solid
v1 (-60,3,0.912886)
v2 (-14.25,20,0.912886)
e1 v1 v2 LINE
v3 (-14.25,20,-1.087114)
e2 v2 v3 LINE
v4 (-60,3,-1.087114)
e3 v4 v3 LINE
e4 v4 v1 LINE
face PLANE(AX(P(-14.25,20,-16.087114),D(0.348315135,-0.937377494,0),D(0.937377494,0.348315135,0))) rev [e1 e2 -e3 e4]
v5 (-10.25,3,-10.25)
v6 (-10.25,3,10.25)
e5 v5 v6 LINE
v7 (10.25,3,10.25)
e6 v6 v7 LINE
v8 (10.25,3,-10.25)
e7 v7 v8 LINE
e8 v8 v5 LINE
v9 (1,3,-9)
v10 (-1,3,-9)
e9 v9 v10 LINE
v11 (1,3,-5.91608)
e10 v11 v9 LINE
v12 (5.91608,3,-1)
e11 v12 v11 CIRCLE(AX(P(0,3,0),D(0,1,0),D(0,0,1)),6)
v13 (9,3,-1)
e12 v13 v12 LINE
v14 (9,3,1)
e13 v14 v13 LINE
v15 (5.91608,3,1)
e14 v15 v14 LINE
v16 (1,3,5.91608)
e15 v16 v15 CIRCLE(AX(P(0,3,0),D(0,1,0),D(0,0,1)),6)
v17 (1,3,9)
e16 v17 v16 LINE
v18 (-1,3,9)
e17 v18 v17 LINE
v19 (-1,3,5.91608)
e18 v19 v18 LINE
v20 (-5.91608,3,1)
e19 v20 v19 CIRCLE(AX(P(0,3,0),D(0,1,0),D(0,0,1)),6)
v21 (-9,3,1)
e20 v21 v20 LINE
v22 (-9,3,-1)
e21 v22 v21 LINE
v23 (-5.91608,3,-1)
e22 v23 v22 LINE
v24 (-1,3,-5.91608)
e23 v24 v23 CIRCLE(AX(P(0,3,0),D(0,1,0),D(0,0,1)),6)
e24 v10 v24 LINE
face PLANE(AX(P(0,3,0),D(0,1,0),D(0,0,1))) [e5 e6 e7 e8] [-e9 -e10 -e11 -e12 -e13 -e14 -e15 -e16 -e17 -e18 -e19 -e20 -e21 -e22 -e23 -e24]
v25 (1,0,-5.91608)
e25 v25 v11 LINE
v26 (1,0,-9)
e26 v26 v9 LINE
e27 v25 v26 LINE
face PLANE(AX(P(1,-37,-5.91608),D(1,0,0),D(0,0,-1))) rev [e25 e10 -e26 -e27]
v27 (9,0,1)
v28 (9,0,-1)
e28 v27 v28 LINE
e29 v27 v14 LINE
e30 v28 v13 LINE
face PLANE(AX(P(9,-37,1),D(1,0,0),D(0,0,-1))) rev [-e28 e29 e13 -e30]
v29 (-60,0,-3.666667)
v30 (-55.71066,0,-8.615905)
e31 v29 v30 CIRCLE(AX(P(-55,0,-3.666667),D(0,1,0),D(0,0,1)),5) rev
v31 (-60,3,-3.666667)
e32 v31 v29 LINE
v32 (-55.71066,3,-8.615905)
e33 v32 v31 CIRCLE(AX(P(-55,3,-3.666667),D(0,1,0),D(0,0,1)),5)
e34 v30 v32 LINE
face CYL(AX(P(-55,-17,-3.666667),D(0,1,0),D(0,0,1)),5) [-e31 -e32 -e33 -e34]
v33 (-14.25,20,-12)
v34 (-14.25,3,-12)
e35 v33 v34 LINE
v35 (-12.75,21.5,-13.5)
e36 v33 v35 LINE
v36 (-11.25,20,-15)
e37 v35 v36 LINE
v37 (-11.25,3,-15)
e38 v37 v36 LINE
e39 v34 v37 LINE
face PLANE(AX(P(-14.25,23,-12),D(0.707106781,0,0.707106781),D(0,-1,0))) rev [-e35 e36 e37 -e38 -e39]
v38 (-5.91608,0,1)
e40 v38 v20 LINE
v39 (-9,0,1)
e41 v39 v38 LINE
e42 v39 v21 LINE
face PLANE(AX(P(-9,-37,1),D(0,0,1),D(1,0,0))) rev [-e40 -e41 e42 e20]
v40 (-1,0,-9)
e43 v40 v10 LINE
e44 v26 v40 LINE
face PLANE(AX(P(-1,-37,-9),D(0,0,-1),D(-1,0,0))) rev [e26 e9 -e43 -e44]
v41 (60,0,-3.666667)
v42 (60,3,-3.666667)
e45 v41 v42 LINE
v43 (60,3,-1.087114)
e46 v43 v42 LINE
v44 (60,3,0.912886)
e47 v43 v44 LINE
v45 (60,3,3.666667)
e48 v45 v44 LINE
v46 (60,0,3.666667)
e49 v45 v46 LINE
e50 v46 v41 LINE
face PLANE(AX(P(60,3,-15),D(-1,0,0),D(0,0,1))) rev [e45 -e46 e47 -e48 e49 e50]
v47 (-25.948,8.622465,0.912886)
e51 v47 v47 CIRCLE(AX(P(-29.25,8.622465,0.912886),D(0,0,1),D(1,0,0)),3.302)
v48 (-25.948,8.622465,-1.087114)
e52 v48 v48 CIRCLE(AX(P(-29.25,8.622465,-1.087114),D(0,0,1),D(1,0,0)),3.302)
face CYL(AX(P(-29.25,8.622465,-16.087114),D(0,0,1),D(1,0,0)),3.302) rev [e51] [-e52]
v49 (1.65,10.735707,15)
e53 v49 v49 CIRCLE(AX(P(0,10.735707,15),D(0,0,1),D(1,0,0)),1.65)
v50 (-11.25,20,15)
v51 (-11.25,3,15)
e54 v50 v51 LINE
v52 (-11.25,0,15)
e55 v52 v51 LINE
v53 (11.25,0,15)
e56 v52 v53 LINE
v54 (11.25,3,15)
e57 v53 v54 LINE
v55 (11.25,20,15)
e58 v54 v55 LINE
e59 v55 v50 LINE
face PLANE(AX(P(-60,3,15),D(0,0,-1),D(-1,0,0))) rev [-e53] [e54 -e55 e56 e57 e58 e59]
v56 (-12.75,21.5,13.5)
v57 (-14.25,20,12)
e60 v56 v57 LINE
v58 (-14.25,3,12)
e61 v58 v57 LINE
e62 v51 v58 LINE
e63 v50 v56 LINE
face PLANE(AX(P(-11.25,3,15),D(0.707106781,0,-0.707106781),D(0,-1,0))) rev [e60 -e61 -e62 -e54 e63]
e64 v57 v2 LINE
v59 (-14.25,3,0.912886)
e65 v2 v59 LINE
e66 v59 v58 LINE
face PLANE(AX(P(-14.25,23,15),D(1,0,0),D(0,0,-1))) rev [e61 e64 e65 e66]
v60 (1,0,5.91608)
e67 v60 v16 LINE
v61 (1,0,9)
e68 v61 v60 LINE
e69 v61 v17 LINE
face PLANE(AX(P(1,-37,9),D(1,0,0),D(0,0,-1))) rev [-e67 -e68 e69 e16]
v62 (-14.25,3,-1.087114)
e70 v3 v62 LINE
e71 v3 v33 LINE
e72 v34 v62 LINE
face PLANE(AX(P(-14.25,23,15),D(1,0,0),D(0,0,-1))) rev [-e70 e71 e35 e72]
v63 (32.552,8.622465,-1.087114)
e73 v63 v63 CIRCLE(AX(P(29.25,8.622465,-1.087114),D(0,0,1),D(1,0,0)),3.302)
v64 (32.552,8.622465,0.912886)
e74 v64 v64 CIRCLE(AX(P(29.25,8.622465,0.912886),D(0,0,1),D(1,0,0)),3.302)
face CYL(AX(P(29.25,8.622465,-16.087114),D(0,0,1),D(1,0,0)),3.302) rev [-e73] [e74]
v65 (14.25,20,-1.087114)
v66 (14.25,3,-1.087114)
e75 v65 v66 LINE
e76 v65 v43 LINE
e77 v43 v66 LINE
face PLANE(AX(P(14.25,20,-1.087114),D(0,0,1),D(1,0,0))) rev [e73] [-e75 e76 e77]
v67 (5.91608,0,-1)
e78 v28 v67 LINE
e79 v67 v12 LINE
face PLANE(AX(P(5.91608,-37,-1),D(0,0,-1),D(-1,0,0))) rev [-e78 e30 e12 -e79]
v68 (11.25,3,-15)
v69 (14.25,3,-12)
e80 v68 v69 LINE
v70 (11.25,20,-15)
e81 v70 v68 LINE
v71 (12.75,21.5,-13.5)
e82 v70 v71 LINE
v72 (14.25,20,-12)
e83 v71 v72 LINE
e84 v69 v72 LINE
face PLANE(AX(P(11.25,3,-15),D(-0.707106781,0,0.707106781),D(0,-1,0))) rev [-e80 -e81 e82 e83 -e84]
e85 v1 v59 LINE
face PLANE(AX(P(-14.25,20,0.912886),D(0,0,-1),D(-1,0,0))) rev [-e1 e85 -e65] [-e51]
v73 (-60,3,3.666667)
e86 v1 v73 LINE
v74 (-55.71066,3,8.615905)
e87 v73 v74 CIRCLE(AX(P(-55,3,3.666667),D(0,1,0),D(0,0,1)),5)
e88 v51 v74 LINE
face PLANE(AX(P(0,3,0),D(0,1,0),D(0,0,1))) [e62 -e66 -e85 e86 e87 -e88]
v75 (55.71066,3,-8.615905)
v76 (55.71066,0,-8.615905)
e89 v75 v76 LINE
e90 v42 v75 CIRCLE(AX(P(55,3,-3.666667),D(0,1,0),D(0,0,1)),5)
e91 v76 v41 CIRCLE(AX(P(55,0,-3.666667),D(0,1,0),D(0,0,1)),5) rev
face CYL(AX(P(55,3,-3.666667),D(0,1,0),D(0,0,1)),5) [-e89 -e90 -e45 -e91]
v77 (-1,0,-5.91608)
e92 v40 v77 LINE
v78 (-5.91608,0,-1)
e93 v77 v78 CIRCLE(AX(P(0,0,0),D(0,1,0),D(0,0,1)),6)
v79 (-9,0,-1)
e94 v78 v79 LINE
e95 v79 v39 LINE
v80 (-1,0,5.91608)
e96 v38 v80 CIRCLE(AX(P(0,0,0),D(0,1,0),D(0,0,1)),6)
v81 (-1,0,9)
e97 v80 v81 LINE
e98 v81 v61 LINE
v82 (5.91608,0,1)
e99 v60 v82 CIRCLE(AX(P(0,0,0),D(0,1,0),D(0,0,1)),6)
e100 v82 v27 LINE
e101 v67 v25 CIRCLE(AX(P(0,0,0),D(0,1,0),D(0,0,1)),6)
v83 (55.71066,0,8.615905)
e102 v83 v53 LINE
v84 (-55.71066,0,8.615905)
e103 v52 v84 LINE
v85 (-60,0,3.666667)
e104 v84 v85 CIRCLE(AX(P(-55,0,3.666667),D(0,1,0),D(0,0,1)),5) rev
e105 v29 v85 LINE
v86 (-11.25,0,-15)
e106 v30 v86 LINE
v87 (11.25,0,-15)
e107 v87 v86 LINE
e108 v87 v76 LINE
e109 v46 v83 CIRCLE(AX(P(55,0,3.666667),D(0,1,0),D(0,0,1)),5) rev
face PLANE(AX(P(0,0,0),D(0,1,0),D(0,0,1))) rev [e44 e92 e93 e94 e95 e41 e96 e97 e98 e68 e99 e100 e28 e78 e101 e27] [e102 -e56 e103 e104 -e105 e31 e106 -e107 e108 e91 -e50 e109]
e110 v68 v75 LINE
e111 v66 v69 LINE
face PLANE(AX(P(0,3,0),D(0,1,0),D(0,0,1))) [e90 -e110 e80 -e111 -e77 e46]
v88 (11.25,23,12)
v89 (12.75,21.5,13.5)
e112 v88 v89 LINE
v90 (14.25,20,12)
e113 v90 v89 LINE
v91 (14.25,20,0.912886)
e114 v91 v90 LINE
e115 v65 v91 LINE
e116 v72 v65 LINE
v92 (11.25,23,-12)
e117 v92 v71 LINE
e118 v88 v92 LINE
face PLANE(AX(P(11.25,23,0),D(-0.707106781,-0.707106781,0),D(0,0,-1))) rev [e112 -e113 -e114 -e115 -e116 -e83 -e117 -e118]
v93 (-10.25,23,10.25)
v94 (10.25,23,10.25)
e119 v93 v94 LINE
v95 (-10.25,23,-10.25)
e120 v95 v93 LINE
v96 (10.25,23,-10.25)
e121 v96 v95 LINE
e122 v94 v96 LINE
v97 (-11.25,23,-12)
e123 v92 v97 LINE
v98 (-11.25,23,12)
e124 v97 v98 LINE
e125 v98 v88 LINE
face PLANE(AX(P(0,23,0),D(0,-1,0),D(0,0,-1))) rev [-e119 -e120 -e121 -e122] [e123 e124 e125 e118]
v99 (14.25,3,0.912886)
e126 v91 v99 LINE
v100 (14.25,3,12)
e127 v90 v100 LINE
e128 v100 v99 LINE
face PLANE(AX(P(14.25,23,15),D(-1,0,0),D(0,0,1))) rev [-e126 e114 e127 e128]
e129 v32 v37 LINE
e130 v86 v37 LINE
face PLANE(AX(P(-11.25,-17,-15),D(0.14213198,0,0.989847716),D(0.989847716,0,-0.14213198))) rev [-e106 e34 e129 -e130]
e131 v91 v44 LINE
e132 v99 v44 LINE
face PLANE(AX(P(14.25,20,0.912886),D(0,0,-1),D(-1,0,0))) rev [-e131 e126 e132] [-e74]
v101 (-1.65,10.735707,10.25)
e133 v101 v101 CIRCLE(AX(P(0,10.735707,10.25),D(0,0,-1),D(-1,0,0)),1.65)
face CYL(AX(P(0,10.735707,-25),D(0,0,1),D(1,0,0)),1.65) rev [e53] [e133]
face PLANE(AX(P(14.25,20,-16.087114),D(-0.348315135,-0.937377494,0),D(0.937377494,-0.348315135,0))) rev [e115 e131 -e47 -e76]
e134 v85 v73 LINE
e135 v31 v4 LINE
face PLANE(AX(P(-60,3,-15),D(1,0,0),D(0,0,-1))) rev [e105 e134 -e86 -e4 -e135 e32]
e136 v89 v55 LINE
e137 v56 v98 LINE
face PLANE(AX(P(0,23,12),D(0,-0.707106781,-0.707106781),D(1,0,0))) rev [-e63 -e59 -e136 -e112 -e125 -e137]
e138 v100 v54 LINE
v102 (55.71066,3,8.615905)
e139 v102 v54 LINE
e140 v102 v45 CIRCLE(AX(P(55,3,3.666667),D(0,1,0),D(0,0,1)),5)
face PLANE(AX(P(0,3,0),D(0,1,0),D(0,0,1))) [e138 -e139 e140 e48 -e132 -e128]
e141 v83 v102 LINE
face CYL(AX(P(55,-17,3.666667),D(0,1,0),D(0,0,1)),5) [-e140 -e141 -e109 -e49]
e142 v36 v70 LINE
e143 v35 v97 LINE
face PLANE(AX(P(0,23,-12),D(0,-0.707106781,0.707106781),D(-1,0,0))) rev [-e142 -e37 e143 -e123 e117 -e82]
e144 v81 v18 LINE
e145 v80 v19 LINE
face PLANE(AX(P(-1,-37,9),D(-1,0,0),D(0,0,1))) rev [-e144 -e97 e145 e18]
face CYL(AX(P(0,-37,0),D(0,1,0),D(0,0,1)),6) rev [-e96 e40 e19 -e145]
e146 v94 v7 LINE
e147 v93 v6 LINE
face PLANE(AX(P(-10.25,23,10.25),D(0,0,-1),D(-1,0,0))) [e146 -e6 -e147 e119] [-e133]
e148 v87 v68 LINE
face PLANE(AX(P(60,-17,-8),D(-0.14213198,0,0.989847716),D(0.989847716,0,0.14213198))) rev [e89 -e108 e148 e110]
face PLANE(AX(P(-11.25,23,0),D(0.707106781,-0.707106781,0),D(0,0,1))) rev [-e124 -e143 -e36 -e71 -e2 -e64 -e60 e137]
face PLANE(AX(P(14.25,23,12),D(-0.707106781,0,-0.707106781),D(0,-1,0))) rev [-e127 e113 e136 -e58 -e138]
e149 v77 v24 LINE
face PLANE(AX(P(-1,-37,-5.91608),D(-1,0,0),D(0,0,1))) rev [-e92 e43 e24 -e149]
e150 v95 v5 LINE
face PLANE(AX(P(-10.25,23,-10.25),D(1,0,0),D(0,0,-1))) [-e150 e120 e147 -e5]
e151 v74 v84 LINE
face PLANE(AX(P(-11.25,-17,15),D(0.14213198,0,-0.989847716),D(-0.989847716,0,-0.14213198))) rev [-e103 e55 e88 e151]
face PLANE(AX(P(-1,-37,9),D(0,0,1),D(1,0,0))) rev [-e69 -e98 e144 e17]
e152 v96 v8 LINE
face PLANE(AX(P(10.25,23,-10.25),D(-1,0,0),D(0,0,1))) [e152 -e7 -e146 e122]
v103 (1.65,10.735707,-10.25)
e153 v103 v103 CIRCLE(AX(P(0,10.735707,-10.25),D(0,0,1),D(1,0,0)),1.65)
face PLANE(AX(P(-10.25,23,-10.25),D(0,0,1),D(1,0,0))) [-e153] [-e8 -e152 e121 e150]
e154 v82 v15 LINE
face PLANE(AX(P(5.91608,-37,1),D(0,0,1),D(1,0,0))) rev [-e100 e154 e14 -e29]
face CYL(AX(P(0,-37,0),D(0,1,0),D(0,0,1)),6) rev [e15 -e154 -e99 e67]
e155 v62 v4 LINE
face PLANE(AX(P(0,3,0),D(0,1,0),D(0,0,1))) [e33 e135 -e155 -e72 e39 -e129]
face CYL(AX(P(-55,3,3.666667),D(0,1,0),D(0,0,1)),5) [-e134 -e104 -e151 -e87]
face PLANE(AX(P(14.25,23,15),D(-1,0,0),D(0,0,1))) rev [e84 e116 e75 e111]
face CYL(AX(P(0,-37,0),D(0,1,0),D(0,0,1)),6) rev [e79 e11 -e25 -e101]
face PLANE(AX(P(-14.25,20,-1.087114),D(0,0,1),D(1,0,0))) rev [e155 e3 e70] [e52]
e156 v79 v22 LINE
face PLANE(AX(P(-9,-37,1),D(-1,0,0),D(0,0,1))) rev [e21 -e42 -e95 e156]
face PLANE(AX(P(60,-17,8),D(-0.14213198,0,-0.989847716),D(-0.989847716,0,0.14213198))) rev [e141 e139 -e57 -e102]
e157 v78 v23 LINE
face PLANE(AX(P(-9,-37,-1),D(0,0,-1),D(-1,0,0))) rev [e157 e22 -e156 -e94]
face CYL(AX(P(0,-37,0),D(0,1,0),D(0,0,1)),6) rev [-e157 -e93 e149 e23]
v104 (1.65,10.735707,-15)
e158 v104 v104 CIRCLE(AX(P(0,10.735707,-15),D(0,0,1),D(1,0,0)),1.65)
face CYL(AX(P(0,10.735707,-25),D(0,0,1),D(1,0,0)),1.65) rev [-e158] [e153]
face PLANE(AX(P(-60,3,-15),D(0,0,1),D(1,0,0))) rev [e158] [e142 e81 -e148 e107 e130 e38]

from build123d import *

# Parameters (mm, degrees)
SKETCH1_W           = 120
SKETCH1_H           = 30
BOSS_EXTRUDE1_DEPTH = 3
SKETCH2_W           = 28.5
SKETCH2_H           = 30
SKETCH2_W_2         = 20.5
SKETCH2_H_2         = 20.5
BOSS_EXTRUDE2_DEPTH = 20
CHAMFER1_SIZE       = 3
CHAMFER2_SIZE       = 3
CUT_EXTRUDE1_DEPTH  = 20
SKETCH4_R           = 1.65
CUT_EXTRUDE2_DEPTH  = 40
CUT_EXTRUDE3_DEPTH  = 40
SKETCH6_W           = 45.75
SKETCH6_H           = 2
BOSS_EXTRUDE3_DEPTH = 17
CUT_EXTRUDE5_DEPTH  = 17
SKETCH8_R           = 3.302
CUT_EXTRUDE6_DEPTH  = 17
FILLET1_R           = 5


with BuildPart() as part:
    # Sketch1 → Boss-Extrude1 (new body)
    with BuildSketch(Plane(origin=(0, 0, 0), x_dir=(1, 0, 0), z_dir=(0, 1, 0))):
        Rectangle(SKETCH1_W, SKETCH1_H)
    extrude(amount=BOSS_EXTRUDE1_DEPTH)

    # Sketch2 → Boss-Extrude2 (add)
    with BuildSketch(Plane(origin=(0, 3, 0), x_dir=(1, 0, 0), z_dir=(0, 1, 0))):
        Rectangle(SKETCH2_W, SKETCH2_H)
        Rectangle(SKETCH2_W_2, SKETCH2_H_2, mode=Mode.SUBTRACT)
    extrude(amount=BOSS_EXTRUDE2_DEPTH)

    # Chamfer1
    chamfer1_edges = [part.edges().sort_by_distance(p)[0] for p in [
        (14.25, 13, 15),
        (14.25, 13, -15),
        (-14.25, 13, -15),
        (-14.25, 13, 15),
    ]]
    chamfer(chamfer1_edges, length=CHAMFER1_SIZE)

    # Chamfer2
    # the kernel refuses this chamfer: 3 mm, written as the material it takes off along each edge
    with BuildSketch(Plane(origin=(18.965048964, 23, -15), x_dir=(0, -0.9996219169112968, -0.02749587661058619), z_dir=(-1, 0, 0)), Plane(origin=(-18.965048964, 23, 15), x_dir=(0, -0.9996219169112968, 0.02749587661058619), z_dir=(1, 0, 0))) as chamfer2_piece_1:
        Polygon((CHAMFER2_SIZE * 0.999621916911, CHAMFER2_SIZE * 0.0274958766106), (-CHAMFER2_SIZE * 0.0274958766106, CHAMFER2_SIZE * 0.999621916911), (0, 0), align=None)
    extrude(amount=37.930097928, mode=Mode.SUBTRACT)
    with BuildSketch(Plane(origin=(14.25, 23, 19.715048964), x_dir=(0.02749587661058619, -0.9996219169112968, 0), z_dir=(0, 0, -1)), Plane(origin=(-14.25, 23, -19.715048964), x_dir=(-0.02749587661058619, -0.9996219169112968, 0), z_dir=(0, 0, 1))) as chamfer2_piece_2:
        Polygon((CHAMFER2_SIZE * 0.999621916911, CHAMFER2_SIZE * 0.0274958766106), (-CHAMFER2_SIZE * 0.0274958766106, CHAMFER2_SIZE * 0.999621916911), (0, 0), align=None)
    extrude(amount=39.430097928, mode=Mode.SUBTRACT)

    # Sketch3 → Cut-Extrude1 (cut)
    with BuildSketch(Plane(origin=(0, 3, 0), x_dir=(1, 0, 0), z_dir=(0, 1, 0))):
        Polygon((-11.25, 15), (-60, 8), (-60, 15), align=None)
        Polygon((-11.25, -15), (-60, -8), (-60, -15), align=None)
        Polygon((11.25, 15), (60, 15), (60, 8), align=None)
        Polygon((11.25, -15), (60, -15), (60, -8), align=None)
    extrude(amount=-CUT_EXTRUDE1_DEPTH, mode=Mode.SUBTRACT)

    # Sketch4 → Cut-Extrude2 (cut)
    with BuildSketch(Plane.XY.offset(15)):
        with Locations((0, 10.735706987)):
            Circle(SKETCH4_R)
    extrude(amount=-CUT_EXTRUDE2_DEPTH, mode=Mode.SUBTRACT)

    # Sketch5 → Cut-Extrude3 (cut)
    with BuildSketch(Plane(origin=(0, 3, 0), x_dir=(1, 0, 0), z_dir=(0, 1, 0))):
        with BuildLine():
            Line((-9, -1), (-5.916079783, -1))
            ThreePointArc((-5.916079783, -1), (-4.242640687, -4.242640687), (-1, -5.916079783))
            Line((-1, -5.916079783), (-1, -9))
            Line((-1, -9), (1, -9))
            Line((1, -9), (1, -5.916079783))
            ThreePointArc((1, -5.916079783), (4.242640687, -4.242640687), (5.916079783, -1))
            Line((5.916079783, -1), (9, -1))
            Line((9, -1), (9, 1))
            Line((9, 1), (5.916079783, 1))
            ThreePointArc((5.916079783, 1), (4.242640687, 4.242640687), (1, 5.916079783))
            Line((1, 5.916079783), (1, 9))
            Line((1, 9), (-1, 9))
            Line((-1, 9), (-1, 5.916079783))
            ThreePointArc((-1, 5.916079783), (-4.242640687, 4.242640687), (-5.916079783, 1))
            Line((-5.916079783, 1), (-9, 1))
            Line((-9, 1), (-9, -1))
        make_face()
    extrude(amount=-CUT_EXTRUDE3_DEPTH, mode=Mode.SUBTRACT)

    # Sketch6 → Boss-Extrude3 (add)
    with BuildSketch(Plane(origin=(0, 3, 0), x_dir=(1, 0, 0), z_dir=(0, 1, 0))):
        with Locations((-37.125, 0.087113991)):
            Rectangle(SKETCH6_W, SKETCH6_H)
        with Locations((37.125, 0.087113991)):
            Rectangle(SKETCH6_W, SKETCH6_H)
    extrude(amount=BOSS_EXTRUDE3_DEPTH)

    # Sketch7 → Cut-Extrude5 (cut)
    with BuildSketch(Plane.XY.offset(0.912886009)):
        Polygon((-14.25, 20), (-60, 3), (-66.007429388, 26.966086251), align=None)
        Polygon((14.25, 20), (60, 3), (71.057586423, 29.350453949), align=None)
    extrude(amount=-CUT_EXTRUDE5_DEPTH, mode=Mode.SUBTRACT)

    # Sketch8 → Cut-Extrude6 (cut)
    with BuildSketch(Plane.XY.offset(0.912886009)):
        with Locations((-29.25, 8.622465364)):
            Circle(SKETCH8_R)
        with Locations((29.25, 8.622465364)):
            Circle(SKETCH8_R)
    extrude(amount=-CUT_EXTRUDE6_DEPTH, mode=Mode.SUBTRACT)

    # Fillet1
    fillet1_edges = [part.edges().sort_by_distance(p)[0] for p in [
        (-60, 1.5, -8),
        (-60, 1.5, 8),
        (60, 1.5, -8),
        (60, 1.5, 8),
    ]]
    fillet(fillet1_edges, radius=FILLET1_R)


solid = part.part
